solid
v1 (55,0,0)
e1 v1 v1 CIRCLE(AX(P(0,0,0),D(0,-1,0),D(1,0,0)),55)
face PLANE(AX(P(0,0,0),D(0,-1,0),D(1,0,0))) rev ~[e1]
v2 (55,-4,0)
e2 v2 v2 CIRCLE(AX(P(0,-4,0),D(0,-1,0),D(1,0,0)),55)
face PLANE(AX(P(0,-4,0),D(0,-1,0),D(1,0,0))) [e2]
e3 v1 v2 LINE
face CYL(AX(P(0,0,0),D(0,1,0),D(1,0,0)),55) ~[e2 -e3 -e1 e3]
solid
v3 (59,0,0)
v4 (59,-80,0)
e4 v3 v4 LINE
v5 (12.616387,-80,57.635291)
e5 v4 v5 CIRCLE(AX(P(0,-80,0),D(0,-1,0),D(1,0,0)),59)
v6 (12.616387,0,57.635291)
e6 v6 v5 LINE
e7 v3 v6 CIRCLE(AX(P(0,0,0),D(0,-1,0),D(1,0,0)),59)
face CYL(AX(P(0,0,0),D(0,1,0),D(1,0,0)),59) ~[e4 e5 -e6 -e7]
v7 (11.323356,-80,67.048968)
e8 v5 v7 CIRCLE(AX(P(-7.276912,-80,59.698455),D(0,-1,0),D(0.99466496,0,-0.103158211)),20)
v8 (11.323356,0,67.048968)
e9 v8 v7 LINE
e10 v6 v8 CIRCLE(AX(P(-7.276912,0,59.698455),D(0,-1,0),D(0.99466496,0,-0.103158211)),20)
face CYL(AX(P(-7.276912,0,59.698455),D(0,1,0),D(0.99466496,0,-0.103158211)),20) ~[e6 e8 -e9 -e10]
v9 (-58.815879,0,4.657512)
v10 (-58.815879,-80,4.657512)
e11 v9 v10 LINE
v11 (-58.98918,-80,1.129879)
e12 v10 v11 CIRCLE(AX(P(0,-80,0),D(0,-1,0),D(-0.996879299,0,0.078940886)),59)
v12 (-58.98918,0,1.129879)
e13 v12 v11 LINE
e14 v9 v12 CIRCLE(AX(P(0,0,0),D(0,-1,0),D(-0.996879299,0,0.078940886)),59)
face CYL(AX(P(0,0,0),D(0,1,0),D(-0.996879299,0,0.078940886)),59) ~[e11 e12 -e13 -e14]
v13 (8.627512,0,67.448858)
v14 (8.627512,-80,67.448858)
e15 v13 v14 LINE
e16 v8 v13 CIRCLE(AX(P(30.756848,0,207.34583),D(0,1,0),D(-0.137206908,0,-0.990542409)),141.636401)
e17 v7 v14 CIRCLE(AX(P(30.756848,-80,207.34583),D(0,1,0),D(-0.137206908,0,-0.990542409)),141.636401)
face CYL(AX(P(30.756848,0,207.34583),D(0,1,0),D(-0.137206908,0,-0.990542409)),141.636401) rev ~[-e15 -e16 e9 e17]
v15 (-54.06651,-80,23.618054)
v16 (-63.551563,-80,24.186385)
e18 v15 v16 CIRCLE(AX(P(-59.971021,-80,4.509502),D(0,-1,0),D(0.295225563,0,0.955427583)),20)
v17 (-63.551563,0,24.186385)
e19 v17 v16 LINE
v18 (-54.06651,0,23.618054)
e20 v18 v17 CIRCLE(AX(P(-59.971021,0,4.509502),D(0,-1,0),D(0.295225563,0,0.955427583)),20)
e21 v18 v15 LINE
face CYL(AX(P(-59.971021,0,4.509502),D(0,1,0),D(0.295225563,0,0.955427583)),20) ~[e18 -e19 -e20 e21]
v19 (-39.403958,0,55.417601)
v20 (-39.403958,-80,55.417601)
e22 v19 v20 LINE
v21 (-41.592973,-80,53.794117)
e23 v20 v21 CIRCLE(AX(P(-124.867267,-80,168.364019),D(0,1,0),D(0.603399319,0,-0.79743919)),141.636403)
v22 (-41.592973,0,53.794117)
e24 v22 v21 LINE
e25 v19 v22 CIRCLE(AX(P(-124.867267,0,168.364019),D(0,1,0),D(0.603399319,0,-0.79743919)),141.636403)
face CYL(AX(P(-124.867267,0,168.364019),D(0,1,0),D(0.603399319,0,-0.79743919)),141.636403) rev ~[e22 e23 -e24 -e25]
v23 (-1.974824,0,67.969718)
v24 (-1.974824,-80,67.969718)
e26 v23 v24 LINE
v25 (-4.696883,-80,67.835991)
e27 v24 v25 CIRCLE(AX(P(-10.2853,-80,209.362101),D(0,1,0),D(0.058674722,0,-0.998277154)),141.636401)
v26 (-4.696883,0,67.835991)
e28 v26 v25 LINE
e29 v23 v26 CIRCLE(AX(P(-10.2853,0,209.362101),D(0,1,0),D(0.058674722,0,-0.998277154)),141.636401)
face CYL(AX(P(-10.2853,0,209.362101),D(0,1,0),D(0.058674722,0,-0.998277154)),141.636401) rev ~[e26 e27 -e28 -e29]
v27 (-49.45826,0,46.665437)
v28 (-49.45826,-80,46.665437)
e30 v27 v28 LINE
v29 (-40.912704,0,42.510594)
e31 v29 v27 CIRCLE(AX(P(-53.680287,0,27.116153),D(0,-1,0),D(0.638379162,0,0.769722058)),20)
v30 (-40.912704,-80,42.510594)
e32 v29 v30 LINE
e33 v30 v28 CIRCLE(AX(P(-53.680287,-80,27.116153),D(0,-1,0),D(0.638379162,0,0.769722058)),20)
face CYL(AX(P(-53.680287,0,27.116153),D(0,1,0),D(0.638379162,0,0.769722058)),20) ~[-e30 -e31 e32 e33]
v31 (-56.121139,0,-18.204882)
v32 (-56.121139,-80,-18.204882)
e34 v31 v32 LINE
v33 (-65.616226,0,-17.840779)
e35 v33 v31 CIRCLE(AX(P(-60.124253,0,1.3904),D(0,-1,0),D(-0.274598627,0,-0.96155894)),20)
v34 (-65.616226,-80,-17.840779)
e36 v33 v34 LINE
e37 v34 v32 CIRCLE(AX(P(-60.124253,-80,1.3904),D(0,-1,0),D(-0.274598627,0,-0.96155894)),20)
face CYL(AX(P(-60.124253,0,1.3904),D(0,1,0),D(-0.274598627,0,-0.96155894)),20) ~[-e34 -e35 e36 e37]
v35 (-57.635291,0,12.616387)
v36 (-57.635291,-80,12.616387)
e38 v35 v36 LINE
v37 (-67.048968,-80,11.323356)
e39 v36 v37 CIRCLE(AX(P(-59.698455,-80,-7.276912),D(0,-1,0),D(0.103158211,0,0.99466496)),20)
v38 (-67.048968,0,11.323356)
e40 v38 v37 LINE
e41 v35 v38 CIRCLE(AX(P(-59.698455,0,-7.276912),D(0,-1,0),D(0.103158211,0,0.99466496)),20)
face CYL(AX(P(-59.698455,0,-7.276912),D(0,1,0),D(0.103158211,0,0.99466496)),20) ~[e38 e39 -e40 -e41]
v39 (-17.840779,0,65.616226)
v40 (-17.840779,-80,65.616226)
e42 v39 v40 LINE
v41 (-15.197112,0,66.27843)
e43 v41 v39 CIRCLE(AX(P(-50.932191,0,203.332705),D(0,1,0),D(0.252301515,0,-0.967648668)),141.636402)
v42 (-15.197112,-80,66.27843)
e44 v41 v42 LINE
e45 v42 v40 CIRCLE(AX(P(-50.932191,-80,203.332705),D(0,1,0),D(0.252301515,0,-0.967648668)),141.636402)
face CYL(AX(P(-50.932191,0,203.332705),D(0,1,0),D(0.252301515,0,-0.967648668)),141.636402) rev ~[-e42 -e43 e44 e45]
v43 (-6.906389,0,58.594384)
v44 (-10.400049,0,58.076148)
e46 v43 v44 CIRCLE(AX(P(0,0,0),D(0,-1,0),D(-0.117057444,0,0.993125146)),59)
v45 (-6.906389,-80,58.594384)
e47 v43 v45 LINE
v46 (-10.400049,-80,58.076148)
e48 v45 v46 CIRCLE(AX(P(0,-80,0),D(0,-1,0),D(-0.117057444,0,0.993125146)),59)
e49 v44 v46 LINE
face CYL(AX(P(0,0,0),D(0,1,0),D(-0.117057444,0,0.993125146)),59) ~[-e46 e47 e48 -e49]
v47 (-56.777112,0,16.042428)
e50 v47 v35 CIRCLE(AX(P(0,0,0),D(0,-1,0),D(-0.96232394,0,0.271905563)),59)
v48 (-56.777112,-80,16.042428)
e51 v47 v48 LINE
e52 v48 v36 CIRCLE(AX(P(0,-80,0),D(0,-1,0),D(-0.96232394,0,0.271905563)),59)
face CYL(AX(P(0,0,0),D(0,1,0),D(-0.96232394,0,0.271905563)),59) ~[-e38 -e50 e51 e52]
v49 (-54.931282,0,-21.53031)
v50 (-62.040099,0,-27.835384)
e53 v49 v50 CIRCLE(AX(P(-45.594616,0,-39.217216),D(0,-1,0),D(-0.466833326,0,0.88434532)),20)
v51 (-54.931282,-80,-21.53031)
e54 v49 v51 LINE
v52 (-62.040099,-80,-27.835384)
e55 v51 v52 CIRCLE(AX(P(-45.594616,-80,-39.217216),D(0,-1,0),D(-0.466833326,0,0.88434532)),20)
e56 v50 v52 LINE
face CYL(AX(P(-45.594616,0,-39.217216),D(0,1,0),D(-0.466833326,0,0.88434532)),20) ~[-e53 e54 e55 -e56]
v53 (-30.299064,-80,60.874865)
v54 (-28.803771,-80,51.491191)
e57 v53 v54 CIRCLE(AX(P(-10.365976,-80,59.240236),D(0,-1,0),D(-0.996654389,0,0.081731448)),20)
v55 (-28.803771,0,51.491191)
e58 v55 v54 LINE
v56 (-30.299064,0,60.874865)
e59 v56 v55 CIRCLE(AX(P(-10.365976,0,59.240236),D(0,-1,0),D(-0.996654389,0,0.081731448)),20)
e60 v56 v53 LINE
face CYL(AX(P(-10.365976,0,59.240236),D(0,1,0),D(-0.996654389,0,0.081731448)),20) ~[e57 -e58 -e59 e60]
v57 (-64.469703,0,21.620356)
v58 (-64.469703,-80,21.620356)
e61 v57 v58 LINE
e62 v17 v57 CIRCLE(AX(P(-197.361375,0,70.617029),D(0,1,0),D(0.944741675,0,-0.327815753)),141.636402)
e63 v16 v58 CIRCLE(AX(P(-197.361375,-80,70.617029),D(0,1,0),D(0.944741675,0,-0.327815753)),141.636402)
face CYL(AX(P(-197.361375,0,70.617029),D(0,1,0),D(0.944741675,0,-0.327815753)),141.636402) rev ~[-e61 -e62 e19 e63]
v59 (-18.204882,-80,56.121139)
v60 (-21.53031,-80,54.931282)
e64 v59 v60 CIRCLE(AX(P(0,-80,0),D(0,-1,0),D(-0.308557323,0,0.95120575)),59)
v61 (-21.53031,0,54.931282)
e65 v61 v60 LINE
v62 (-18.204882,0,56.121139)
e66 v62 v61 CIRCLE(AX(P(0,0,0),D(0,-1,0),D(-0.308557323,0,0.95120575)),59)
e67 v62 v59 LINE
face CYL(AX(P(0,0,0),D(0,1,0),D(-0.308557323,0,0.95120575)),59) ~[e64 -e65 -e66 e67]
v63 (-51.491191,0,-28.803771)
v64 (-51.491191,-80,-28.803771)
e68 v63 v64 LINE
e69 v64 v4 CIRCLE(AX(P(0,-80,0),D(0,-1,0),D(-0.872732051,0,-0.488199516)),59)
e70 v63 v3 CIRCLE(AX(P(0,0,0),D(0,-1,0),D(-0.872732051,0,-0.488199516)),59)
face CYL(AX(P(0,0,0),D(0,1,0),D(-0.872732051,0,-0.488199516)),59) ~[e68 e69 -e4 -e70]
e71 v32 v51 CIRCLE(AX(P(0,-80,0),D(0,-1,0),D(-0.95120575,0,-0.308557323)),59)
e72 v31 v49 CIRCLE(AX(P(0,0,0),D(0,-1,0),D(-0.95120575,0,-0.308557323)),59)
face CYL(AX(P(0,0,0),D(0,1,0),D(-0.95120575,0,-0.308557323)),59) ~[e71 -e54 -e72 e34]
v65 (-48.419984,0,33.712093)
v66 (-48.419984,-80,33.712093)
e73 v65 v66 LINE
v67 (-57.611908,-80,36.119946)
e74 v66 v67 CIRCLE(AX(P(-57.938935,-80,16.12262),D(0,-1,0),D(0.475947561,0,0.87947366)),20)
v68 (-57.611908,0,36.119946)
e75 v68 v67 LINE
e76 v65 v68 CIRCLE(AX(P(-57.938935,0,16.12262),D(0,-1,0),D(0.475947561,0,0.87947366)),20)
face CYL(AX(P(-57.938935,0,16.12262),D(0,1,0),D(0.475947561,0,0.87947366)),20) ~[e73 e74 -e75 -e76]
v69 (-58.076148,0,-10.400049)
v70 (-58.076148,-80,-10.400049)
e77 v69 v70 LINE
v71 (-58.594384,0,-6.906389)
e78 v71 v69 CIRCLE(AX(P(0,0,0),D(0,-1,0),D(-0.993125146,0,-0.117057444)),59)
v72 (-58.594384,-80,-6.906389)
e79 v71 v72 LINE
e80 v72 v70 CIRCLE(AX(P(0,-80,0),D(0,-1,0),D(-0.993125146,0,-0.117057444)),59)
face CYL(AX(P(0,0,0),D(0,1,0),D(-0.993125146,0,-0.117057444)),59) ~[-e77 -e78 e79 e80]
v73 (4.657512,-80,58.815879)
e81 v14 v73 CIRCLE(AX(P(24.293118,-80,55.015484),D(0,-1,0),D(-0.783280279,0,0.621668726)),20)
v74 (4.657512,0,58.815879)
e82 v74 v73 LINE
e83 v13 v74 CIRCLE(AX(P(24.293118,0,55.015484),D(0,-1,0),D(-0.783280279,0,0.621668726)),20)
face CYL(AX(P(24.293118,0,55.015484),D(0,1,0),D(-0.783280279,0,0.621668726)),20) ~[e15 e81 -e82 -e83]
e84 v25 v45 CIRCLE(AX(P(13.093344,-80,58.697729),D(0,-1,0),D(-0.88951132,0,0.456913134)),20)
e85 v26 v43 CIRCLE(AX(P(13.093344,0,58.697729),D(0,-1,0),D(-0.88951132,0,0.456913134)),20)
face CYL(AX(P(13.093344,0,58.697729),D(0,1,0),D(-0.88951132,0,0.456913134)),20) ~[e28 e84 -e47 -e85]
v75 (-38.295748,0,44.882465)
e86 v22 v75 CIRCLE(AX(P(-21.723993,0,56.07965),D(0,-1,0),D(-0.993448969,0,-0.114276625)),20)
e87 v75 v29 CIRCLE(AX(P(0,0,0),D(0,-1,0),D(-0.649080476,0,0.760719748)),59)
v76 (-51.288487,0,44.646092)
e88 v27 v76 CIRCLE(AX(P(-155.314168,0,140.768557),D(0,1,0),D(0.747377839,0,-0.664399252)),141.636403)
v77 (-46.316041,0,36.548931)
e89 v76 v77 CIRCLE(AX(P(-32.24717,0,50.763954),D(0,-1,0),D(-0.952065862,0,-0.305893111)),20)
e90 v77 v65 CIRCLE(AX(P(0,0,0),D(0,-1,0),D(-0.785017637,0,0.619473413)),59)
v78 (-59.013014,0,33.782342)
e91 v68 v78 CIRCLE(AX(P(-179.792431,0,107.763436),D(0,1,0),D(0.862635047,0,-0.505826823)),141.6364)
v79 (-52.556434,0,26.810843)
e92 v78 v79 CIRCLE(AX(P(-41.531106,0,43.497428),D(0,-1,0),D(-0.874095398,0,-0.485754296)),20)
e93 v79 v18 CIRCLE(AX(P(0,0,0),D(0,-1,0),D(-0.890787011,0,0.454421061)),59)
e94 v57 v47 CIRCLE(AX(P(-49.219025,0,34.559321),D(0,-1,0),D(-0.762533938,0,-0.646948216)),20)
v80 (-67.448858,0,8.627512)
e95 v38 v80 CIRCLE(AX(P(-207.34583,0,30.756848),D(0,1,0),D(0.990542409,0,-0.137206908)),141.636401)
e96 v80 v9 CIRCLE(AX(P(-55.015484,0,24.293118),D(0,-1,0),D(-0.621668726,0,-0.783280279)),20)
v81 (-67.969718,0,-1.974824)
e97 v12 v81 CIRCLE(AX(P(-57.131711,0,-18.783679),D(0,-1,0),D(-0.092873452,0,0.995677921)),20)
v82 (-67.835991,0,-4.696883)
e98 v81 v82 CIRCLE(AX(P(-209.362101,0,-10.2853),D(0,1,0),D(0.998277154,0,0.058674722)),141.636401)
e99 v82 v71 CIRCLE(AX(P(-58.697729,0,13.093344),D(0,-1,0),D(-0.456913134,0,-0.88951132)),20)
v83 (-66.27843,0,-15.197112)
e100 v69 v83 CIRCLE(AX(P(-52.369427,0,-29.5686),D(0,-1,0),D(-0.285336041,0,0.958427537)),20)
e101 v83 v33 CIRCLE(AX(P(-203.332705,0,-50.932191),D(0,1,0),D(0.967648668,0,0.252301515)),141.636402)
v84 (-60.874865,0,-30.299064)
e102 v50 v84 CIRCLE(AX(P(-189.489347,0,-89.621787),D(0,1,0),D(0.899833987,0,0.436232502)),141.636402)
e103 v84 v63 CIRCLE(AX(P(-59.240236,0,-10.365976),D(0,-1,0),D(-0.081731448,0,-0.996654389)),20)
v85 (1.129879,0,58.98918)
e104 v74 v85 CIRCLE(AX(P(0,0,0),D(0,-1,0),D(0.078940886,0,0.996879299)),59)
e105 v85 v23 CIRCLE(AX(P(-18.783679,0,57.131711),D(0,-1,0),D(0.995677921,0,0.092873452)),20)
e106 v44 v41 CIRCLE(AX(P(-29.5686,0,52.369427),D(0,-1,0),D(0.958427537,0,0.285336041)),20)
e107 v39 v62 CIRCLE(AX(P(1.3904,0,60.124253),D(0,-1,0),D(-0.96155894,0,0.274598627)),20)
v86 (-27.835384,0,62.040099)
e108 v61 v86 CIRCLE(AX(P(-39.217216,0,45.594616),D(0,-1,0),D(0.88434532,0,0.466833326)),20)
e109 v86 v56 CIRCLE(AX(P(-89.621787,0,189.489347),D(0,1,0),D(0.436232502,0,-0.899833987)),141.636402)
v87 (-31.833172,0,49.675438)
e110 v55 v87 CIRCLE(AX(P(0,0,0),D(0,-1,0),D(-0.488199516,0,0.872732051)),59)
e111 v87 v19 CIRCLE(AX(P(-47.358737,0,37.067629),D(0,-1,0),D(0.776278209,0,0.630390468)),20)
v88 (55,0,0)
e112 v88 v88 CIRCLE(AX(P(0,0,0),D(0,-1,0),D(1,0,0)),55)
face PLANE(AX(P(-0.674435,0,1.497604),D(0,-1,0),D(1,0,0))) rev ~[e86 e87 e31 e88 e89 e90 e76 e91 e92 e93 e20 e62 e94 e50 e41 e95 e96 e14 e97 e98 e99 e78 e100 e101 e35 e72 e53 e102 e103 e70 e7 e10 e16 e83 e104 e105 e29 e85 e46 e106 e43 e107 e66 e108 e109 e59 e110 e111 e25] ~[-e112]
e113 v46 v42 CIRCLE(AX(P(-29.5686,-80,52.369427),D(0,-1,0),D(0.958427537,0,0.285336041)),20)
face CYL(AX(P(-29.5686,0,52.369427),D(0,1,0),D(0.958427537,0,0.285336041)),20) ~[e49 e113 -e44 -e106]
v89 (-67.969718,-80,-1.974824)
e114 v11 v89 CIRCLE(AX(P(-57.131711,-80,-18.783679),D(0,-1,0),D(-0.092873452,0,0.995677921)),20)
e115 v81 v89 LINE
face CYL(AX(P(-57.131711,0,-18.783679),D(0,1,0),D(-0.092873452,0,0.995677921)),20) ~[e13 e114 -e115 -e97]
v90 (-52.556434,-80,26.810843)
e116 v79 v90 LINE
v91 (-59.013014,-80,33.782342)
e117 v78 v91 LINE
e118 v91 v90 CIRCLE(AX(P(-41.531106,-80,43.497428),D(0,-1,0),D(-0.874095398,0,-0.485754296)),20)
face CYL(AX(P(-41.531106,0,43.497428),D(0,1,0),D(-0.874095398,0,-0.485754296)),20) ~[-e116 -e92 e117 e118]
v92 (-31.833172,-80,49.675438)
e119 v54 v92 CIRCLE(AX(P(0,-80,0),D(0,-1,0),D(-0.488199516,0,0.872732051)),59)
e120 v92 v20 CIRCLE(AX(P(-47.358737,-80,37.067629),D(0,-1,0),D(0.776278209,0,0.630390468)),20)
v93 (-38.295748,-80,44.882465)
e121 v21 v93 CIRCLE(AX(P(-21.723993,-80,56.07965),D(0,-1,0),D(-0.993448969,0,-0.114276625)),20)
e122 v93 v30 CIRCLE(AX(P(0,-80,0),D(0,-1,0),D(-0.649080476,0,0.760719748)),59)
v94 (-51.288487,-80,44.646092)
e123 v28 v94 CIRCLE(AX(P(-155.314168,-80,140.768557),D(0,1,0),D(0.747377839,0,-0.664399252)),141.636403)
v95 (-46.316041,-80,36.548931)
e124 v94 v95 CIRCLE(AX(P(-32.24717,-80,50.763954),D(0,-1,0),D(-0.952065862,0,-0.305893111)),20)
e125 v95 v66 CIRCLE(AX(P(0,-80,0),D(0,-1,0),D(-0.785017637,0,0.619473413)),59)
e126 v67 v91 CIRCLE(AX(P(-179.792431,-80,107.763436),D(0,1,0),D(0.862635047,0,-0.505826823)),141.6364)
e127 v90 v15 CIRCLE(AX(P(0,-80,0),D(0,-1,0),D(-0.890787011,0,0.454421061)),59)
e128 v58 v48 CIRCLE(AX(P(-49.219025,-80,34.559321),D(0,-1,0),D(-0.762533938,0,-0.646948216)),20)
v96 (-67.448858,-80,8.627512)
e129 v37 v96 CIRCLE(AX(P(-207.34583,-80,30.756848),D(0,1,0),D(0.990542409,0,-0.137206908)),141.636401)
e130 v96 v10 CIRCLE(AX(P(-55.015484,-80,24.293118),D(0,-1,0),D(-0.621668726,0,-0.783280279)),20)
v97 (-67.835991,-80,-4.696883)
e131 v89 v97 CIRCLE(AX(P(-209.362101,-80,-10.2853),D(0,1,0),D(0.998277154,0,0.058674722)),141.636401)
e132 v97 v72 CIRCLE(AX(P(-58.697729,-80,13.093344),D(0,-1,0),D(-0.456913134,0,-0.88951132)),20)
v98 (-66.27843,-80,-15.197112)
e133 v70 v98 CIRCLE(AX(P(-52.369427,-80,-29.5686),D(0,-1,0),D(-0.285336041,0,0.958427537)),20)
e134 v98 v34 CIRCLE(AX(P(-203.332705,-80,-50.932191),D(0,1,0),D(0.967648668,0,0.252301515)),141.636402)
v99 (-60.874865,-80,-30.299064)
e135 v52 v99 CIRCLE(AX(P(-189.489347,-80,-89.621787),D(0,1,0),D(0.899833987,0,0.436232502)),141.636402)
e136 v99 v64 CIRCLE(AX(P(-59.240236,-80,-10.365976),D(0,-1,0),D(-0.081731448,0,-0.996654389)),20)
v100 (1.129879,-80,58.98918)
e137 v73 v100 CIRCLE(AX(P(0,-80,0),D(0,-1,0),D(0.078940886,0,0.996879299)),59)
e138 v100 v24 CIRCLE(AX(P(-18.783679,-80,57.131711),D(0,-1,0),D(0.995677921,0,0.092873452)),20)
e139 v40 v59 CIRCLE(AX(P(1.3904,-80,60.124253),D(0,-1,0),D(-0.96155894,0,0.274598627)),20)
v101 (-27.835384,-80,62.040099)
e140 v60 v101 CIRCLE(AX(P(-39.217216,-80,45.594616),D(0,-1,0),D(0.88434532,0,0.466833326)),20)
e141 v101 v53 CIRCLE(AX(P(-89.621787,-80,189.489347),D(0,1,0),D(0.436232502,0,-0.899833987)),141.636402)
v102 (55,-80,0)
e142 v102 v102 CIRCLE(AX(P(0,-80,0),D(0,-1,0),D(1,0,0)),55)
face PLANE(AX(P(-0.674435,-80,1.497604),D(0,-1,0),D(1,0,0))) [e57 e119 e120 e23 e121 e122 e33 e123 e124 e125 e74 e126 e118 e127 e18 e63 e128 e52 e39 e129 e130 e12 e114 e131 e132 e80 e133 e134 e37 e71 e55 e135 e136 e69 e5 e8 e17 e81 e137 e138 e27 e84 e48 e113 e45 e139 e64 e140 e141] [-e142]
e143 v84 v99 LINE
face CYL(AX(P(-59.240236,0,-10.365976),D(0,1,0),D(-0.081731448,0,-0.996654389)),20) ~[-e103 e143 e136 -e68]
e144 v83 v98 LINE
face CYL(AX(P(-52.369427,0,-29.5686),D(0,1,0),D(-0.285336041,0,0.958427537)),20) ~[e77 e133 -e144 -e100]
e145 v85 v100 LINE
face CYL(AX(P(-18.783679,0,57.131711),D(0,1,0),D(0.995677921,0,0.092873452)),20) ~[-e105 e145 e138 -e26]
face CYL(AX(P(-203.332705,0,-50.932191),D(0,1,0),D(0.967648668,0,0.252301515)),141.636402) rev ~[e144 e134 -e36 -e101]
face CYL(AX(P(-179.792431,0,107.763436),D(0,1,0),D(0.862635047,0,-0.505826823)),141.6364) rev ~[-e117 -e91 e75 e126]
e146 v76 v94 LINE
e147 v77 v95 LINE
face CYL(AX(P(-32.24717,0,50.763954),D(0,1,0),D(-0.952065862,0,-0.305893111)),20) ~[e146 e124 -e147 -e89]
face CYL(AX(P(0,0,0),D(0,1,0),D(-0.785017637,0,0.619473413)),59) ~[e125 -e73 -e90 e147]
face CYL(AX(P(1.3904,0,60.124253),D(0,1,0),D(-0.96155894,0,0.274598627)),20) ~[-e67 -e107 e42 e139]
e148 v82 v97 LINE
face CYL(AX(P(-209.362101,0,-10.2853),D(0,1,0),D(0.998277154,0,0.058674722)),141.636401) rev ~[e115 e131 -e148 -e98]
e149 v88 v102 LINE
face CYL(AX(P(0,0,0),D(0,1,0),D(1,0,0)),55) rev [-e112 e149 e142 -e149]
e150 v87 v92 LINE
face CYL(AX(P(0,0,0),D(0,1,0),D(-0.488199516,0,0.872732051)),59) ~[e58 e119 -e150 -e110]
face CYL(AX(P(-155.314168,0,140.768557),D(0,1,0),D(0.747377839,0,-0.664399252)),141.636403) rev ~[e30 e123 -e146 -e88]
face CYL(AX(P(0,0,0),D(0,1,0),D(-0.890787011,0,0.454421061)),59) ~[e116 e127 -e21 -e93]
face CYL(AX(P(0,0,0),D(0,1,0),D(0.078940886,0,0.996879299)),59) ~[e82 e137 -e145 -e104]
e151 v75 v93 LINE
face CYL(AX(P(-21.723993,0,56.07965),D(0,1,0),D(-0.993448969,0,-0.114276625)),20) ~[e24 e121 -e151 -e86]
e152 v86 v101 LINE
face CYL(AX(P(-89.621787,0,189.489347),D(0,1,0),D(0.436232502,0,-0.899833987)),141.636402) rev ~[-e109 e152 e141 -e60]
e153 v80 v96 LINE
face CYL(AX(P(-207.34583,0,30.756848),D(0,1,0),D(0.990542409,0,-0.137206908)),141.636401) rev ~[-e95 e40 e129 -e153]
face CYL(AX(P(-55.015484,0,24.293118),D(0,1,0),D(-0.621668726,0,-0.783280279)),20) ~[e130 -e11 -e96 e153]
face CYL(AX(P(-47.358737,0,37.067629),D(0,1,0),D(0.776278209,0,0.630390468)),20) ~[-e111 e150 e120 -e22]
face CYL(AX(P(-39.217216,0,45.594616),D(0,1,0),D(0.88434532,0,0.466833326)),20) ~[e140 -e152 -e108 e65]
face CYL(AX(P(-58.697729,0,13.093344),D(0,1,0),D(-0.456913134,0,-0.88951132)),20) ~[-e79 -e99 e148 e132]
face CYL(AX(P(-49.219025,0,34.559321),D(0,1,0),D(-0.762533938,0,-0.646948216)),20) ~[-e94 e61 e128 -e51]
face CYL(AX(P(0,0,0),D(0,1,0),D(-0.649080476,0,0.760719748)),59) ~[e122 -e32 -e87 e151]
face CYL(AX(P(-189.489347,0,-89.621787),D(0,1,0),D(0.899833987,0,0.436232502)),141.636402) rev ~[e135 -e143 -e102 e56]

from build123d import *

# Parameters (mm, degrees)
F0_R     = 55
F1_DEPTH = 80
F2_DEPTH = 80
F3_DEPTH = 4


with BuildPart() as f1:
    # F0 (on Front) → F1 (new body)
    with BuildSketch(Plane.XZ):
        with BuildLine():
            ThreePointArc((-51.4911909934, -28.8037714558), (14.8832075069, -57.0919445658), (59, 0))
            ThreePointArc((59, 0), (45.9639360321, 36.9907635016), (12.6163869683, 57.6352910973))
            ThreePointArc((12.6163869683, 57.6352910973), (8.6570979929, 58.3614140879), (4.6575122934, 58.8158786319))
            ThreePointArc((4.6575122934, 58.8158786319), (2.8949927853, 58.9289319161), (1.1298791308, 58.9891801363))
            ThreePointArc((1.1298791308, 58.9891801363), (-2.8949927853, 58.9289319161), (-6.9063892013, 58.5943835892))
            ThreePointArc((-6.9063892013, 58.5943835892), (-8.6570979929, 58.3614140879), (-10.4000493282, 58.0761480642))
            ThreePointArc((-10.4000493282, 58.0761480642), (-14.3358306143, 57.2318439385), (-18.2048820321, 56.1211392454))
            ThreePointArc((-18.2048820321, 56.1211392454), (-19.8765013501, 55.5510998458), (-21.5303097238, 54.9312821914))
            ThreePointArc((-21.5303097238, 54.9312821914), (-25.2257505124, 53.3353682943), (-28.8037714558, 51.4911909934))
            ThreePointArc((-28.8037714558, 51.4911909934), (-30.3320619074, 50.60598799), (-31.8331723911, 49.6754379499))
            ThreePointArc((-31.8331723911, 49.6754379499), (-35.1462589651, 47.3892443574), (-38.2957480959, 44.8824651482))
            ThreePointArc((-38.2957480959, 44.8824651482), (-39.621978336, 43.7161163959), (-40.9127040957, 42.5105944863))
            ThreePointArc((-40.9127040957, 42.5105944863), (-43.7161163959, 39.621978336), (-46.3160406131, 36.5489313377))
            ThreePointArc((-46.3160406131, 36.5489313377), (-47.3892443574, 35.1462589651), (-48.419983526, 33.7120927168))
            ThreePointArc((-48.419983526, 33.7120927168), (-50.60598799, 30.3320619074), (-52.5564336639, 26.8108425927))
            ThreePointArc((-52.5564336639, 26.8108425927), (-53.3353682943, 25.2257505124), (-54.0665101436, 23.6180541301))
            ThreePointArc((-54.0665101436, 23.6180541301), (-55.5510998458, 19.8765013501), (-56.777112443, 16.0424282026))
            ThreePointArc((-56.777112443, 16.0424282026), (-57.2318439385, 14.3358306143), (-57.6352910973, 12.6163869683))
            ThreePointArc((-57.6352910973, 12.6163869683), (-58.3614140879, 8.6570979929), (-58.8158786319, 4.6575122934))
            ThreePointArc((-58.8158786319, 4.6575122934), (-58.9289319161, 2.8949927853), (-58.9891801363, 1.1298791308))
            ThreePointArc((-58.9891801363, 1.1298791308), (-58.9289319161, -2.8949927853), (-58.5943835892, -6.9063892013))
            ThreePointArc((-58.5943835892, -6.9063892013), (-58.3614140879, -8.6570979929), (-58.0761480642, -10.4000493282))
            ThreePointArc((-58.0761480642, -10.4000493282), (-57.2318439385, -14.3358306143), (-56.1211392454, -18.2048820321))
            ThreePointArc((-56.1211392454, -18.2048820321), (-55.5510998458, -19.8765013501), (-54.9312821914, -21.5303097238))
            ThreePointArc((-54.9312821914, -21.5303097238), (-53.3353682943, -25.2257505124), (-51.4911909934, -28.8037714558))
        make_face()
        Circle(F0_R, mode=Mode.SUBTRACT)
    extrude(amount=F1_DEPTH)

    # F0 (on Front) → F2 (join)
    with BuildSketch(Plane.XZ):
        with BuildLine():
            ThreePointArc((-51.4911909934, -28.8037714558), (14.8832075069, -57.0919445658), (59, 0))
            ThreePointArc((59, 0), (45.9639360321, 36.9907635016), (12.6163869683, 57.6352910973))
            ThreePointArc((12.6163869683, 57.6352910973), (8.6570979929, 58.3614140879), (4.6575122934, 58.8158786319))
            ThreePointArc((4.6575122934, 58.8158786319), (2.8949927853, 58.9289319161), (1.1298791308, 58.9891801363))
            ThreePointArc((1.1298791308, 58.9891801363), (-2.8949927853, 58.9289319161), (-6.9063892013, 58.5943835892))
            ThreePointArc((-6.9063892013, 58.5943835892), (-8.6570979929, 58.3614140879), (-10.4000493282, 58.0761480642))
            ThreePointArc((-10.4000493282, 58.0761480642), (-14.3358306143, 57.2318439385), (-18.2048820321, 56.1211392454))
            ThreePointArc((-18.2048820321, 56.1211392454), (-19.8765013501, 55.5510998458), (-21.5303097238, 54.9312821914))
            ThreePointArc((-21.5303097238, 54.9312821914), (-25.2257505124, 53.3353682943), (-28.8037714558, 51.4911909934))
            ThreePointArc((-28.8037714558, 51.4911909934), (-30.3320619074, 50.60598799), (-31.8331723911, 49.6754379499))
            ThreePointArc((-31.8331723911, 49.6754379499), (-35.1462589651, 47.3892443574), (-38.2957480959, 44.8824651482))
            ThreePointArc((-38.2957480959, 44.8824651482), (-39.621978336, 43.7161163959), (-40.9127040957, 42.5105944863))
            ThreePointArc((-40.9127040957, 42.5105944863), (-43.7161163959, 39.621978336), (-46.3160406131, 36.5489313377))
            ThreePointArc((-46.3160406131, 36.5489313377), (-47.3892443574, 35.1462589651), (-48.419983526, 33.7120927168))
            ThreePointArc((-48.419983526, 33.7120927168), (-50.60598799, 30.3320619074), (-52.5564336639, 26.8108425927))
            ThreePointArc((-52.5564336639, 26.8108425927), (-53.3353682943, 25.2257505124), (-54.0665101436, 23.6180541301))
            ThreePointArc((-54.0665101436, 23.6180541301), (-55.5510998458, 19.8765013501), (-56.777112443, 16.0424282026))
            ThreePointArc((-56.777112443, 16.0424282026), (-57.2318439385, 14.3358306143), (-57.6352910973, 12.6163869683))
            ThreePointArc((-57.6352910973, 12.6163869683), (-58.3614140879, 8.6570979929), (-58.8158786319, 4.6575122934))
            ThreePointArc((-58.8158786319, 4.6575122934), (-58.9289319161, 2.8949927853), (-58.9891801363, 1.1298791308))
            ThreePointArc((-58.9891801363, 1.1298791308), (-58.9289319161, -2.8949927853), (-58.5943835892, -6.9063892013))
            ThreePointArc((-58.5943835892, -6.9063892013), (-58.3614140879, -8.6570979929), (-58.0761480642, -10.4000493282))
            ThreePointArc((-58.0761480642, -10.4000493282), (-57.2318439385, -14.3358306143), (-56.1211392454, -18.2048820321))
            ThreePointArc((-56.1211392454, -18.2048820321), (-55.5510998458, -19.8765013501), (-54.9312821914, -21.5303097238))
            ThreePointArc((-54.9312821914, -21.5303097238), (-53.3353682943, -25.2257505124), (-51.4911909934, -28.8037714558))
        make_face()
        Circle(F0_R, mode=Mode.SUBTRACT)
        with BuildLine():
            ThreePointArc((4.6575122934, 58.8158786319), (8.6570979929, 58.3614140879), (12.6163869683, 57.6352910973))
            ThreePointArc((12.6163869683, 57.6352910973), (12.5370476129, 62.4200348178), (11.3233557269, 67.048967655))
            ThreePointArc((11.3233557269, 67.048967655), (9.9744720661, 67.2424287026), (8.627512105, 67.4488582809))
            ThreePointArc((8.627512105, 67.4488582809), (6.1223731095, 63.371561895), (4.6575122934, 58.8158786319))
        make_face()
        with BuildLine():
            ThreePointArc((-60.8748649556, -30.2990637669), (-56.092936255, -30.1167862131), (-51.4911909934, -28.8037714558))
            ThreePointArc((-51.4911909934, -28.8037714558), (-53.3353682943, -25.2257505124), (-54.9312821914, -21.5303097238))
            ThreePointArc((-54.9312821914, -21.5303097238), (-58.8655726136, -24.2545391707), (-62.0400985212, -27.8353843876))
            ThreePointArc((-62.0400985212, -27.8353843876), (-61.4515558937, -29.0644213614), (-60.8748649556, -30.2990637669))
        make_face()
        with BuildLine():
            ThreePointArc((-6.9063892013, 58.5943835892), (-2.8949927853, 58.9289319161), (1.1298791308, 58.9891801363))
            ThreePointArc((1.1298791308, 58.9891801363), (0.1186070656, 63.6665080075), (-1.9748240689, 67.9697176573))
            ThreePointArc((-1.9748240689, 67.9697176573), (-3.3355316865, 67.8963072574), (-4.6968826025, 67.8359914967))
            ThreePointArc((-4.6968826025, 67.8359914967), (-6.3584449898, 63.3483108443), (-6.9063892013, 58.5943835892))
        make_face()
        with BuildLine():
            ThreePointArc((-65.6162256021, -17.8407787457), (-60.8906197339, -18.5949116141), (-56.1211392454, -18.2048820321))
            ThreePointArc((-56.1211392454, -18.2048820321), (-57.2318439385, -14.3358306143), (-58.0761480642, -10.4000493282))
            ThreePointArc((-58.0761480642, -10.4000493282), (-62.4663129991, -12.3043914847), (-66.2784295279, -15.1971124833))
            ThreePointArc((-66.2784295279, -15.1971124833), (-65.940968801, -16.517352827), (-65.6162256021, -17.8407787457))
        make_face()
        with BuildLine():
            ThreePointArc((-18.2048820321, 56.1211392454), (-14.3358306143, 57.2318439385), (-10.4000493282, 58.0761480642))
            ThreePointArc((-10.4000493282, 58.0761480642), (-12.3043914847, 62.4663129991), (-15.1971124833, 66.2784295279))
            ThreePointArc((-15.1971124833, 66.2784295279), (-16.517352827, 65.940968801), (-17.8407787457, 65.6162256021))
            ThreePointArc((-17.8407787457, 65.6162256021), (-18.5949116141, 60.8906197339), (-18.2048820321, 56.1211392454))
        make_face()
        with BuildLine():
            ThreePointArc((-67.8359914967, -4.6968826025), (-63.3483108443, -6.3584449898), (-58.5943835892, -6.9063892013))
            ThreePointArc((-58.5943835892, -6.9063892013), (-58.9289319161, -2.8949927853), (-58.9891801363, 1.1298791308))
            ThreePointArc((-58.9891801363, 1.1298791308), (-63.6665080075, 0.1186070656), (-67.9697176573, -1.9748240689))
            ThreePointArc((-67.9697176573, -1.9748240689), (-67.8963072574, -3.3355316865), (-67.8359914967, -4.6968826025))
        make_face()
        with BuildLine():
            ThreePointArc((-28.8037714558, 51.4911909934), (-25.2257505124, 53.3353682943), (-21.5303097238, 54.9312821914))
            ThreePointArc((-21.5303097238, 54.9312821914), (-24.2545391707, 58.8655726136), (-27.8353843876, 62.0400985212))
            ThreePointArc((-27.8353843876, 62.0400985212), (-29.0644213614, 61.4515558937), (-30.2990637669, 60.8748649556))
            ThreePointArc((-30.2990637669, 60.8748649556), (-30.1167862131, 56.092936255), (-28.8037714558, 51.4911909934))
        make_face()
        with BuildLine():
            ThreePointArc((-67.4488582809, 8.627512105), (-63.371561895, 6.1223731095), (-58.8158786319, 4.6575122934))
            ThreePointArc((-58.8158786319, 4.6575122934), (-58.3614140879, 8.6570979929), (-57.6352910973, 12.6163869683))
            ThreePointArc((-57.6352910973, 12.6163869683), (-62.4200348178, 12.5370476129), (-67.048967655, 11.3233557269))
            ThreePointArc((-67.048967655, 11.3233557269), (-67.2424287026, 9.9744720661), (-67.4488582809, 8.627512105))
        make_face()
        with BuildLine():
            ThreePointArc((-38.2957480959, 44.8824651482), (-35.1462589651, 47.3892443574), (-31.8331723911, 49.6754379499))
            ThreePointArc((-31.8331723911, 49.6754379499), (-35.2725985184, 53.0026612847), (-39.4039580801, 55.4176013207))
            ThreePointArc((-39.4039580801, 55.4176013207), (-40.4945604824, 54.6005941558), (-41.5929727595, 53.7941173879))
            ThreePointArc((-41.5929727595, 53.7941173879), (-40.4812896077, 49.1396326931), (-38.2957480959, 44.8824651482))
        make_face()
        with BuildLine():
            ThreePointArc((-64.4697032671, 21.6203563608), (-60.9594793614, 18.3679118437), (-56.777112443, 16.0424282026))
            ThreePointArc((-56.777112443, 16.0424282026), (-55.5510998458, 19.8765013501), (-54.0665101436, 23.6180541301))
            ThreePointArc((-54.0665101436, 23.6180541301), (-58.7747946957, 24.4736964513), (-63.5515634272, 24.1863853124))
            ThreePointArc((-63.5515634272, 24.1863853124), (-64.0044613228, 22.9011624509), (-64.4697032671, 21.6203563608))
        make_face()
        with BuildLine():
            ThreePointArc((-46.3160406131, 36.5489313377), (-43.7161163959, 39.621978336), (-40.9127040957, 42.5105944863))
            ThreePointArc((-40.9127040957, 42.5105944863), (-44.9351516862, 45.102887407), (-49.4582597616, 46.66543678))
            ThreePointArc((-49.4582597616, 46.66543678), (-50.3685163537, 45.6513622048), (-51.2884871345, 44.6460920571))
            ThreePointArc((-51.2884871345, 44.6460920571), (-49.2901197448, 40.2979206046), (-46.3160406131, 36.5489313377))
        make_face()
        with BuildLine():
            ThreePointArc((-59.0130137119, 33.7823424464), (-56.2047582223, 29.9075820266), (-52.5564336639, 26.8108425927))
            ThreePointArc((-52.5564336639, 26.8108425927), (-50.60598799, 30.3320619074), (-48.419983526, 33.7120927168))
            ThreePointArc((-48.419983526, 33.7120927168), (-52.8708721746, 35.4698348601), (-57.611908257, 36.1199456742))
            ThreePointArc((-57.611908257, 36.1199456742), (-58.3068383884, 34.9477740059), (-59.0130137119, 33.7823424464))
        make_face()
    extrude(amount=F2_DEPTH)


with BuildPart() as f3:
    # F0 (on Front) → F3 (new body)
    with BuildSketch(Plane.XZ):
        Circle(F0_R)
    extrude(amount=F3_DEPTH)


solid = Compound([f1.part, f3.part])
